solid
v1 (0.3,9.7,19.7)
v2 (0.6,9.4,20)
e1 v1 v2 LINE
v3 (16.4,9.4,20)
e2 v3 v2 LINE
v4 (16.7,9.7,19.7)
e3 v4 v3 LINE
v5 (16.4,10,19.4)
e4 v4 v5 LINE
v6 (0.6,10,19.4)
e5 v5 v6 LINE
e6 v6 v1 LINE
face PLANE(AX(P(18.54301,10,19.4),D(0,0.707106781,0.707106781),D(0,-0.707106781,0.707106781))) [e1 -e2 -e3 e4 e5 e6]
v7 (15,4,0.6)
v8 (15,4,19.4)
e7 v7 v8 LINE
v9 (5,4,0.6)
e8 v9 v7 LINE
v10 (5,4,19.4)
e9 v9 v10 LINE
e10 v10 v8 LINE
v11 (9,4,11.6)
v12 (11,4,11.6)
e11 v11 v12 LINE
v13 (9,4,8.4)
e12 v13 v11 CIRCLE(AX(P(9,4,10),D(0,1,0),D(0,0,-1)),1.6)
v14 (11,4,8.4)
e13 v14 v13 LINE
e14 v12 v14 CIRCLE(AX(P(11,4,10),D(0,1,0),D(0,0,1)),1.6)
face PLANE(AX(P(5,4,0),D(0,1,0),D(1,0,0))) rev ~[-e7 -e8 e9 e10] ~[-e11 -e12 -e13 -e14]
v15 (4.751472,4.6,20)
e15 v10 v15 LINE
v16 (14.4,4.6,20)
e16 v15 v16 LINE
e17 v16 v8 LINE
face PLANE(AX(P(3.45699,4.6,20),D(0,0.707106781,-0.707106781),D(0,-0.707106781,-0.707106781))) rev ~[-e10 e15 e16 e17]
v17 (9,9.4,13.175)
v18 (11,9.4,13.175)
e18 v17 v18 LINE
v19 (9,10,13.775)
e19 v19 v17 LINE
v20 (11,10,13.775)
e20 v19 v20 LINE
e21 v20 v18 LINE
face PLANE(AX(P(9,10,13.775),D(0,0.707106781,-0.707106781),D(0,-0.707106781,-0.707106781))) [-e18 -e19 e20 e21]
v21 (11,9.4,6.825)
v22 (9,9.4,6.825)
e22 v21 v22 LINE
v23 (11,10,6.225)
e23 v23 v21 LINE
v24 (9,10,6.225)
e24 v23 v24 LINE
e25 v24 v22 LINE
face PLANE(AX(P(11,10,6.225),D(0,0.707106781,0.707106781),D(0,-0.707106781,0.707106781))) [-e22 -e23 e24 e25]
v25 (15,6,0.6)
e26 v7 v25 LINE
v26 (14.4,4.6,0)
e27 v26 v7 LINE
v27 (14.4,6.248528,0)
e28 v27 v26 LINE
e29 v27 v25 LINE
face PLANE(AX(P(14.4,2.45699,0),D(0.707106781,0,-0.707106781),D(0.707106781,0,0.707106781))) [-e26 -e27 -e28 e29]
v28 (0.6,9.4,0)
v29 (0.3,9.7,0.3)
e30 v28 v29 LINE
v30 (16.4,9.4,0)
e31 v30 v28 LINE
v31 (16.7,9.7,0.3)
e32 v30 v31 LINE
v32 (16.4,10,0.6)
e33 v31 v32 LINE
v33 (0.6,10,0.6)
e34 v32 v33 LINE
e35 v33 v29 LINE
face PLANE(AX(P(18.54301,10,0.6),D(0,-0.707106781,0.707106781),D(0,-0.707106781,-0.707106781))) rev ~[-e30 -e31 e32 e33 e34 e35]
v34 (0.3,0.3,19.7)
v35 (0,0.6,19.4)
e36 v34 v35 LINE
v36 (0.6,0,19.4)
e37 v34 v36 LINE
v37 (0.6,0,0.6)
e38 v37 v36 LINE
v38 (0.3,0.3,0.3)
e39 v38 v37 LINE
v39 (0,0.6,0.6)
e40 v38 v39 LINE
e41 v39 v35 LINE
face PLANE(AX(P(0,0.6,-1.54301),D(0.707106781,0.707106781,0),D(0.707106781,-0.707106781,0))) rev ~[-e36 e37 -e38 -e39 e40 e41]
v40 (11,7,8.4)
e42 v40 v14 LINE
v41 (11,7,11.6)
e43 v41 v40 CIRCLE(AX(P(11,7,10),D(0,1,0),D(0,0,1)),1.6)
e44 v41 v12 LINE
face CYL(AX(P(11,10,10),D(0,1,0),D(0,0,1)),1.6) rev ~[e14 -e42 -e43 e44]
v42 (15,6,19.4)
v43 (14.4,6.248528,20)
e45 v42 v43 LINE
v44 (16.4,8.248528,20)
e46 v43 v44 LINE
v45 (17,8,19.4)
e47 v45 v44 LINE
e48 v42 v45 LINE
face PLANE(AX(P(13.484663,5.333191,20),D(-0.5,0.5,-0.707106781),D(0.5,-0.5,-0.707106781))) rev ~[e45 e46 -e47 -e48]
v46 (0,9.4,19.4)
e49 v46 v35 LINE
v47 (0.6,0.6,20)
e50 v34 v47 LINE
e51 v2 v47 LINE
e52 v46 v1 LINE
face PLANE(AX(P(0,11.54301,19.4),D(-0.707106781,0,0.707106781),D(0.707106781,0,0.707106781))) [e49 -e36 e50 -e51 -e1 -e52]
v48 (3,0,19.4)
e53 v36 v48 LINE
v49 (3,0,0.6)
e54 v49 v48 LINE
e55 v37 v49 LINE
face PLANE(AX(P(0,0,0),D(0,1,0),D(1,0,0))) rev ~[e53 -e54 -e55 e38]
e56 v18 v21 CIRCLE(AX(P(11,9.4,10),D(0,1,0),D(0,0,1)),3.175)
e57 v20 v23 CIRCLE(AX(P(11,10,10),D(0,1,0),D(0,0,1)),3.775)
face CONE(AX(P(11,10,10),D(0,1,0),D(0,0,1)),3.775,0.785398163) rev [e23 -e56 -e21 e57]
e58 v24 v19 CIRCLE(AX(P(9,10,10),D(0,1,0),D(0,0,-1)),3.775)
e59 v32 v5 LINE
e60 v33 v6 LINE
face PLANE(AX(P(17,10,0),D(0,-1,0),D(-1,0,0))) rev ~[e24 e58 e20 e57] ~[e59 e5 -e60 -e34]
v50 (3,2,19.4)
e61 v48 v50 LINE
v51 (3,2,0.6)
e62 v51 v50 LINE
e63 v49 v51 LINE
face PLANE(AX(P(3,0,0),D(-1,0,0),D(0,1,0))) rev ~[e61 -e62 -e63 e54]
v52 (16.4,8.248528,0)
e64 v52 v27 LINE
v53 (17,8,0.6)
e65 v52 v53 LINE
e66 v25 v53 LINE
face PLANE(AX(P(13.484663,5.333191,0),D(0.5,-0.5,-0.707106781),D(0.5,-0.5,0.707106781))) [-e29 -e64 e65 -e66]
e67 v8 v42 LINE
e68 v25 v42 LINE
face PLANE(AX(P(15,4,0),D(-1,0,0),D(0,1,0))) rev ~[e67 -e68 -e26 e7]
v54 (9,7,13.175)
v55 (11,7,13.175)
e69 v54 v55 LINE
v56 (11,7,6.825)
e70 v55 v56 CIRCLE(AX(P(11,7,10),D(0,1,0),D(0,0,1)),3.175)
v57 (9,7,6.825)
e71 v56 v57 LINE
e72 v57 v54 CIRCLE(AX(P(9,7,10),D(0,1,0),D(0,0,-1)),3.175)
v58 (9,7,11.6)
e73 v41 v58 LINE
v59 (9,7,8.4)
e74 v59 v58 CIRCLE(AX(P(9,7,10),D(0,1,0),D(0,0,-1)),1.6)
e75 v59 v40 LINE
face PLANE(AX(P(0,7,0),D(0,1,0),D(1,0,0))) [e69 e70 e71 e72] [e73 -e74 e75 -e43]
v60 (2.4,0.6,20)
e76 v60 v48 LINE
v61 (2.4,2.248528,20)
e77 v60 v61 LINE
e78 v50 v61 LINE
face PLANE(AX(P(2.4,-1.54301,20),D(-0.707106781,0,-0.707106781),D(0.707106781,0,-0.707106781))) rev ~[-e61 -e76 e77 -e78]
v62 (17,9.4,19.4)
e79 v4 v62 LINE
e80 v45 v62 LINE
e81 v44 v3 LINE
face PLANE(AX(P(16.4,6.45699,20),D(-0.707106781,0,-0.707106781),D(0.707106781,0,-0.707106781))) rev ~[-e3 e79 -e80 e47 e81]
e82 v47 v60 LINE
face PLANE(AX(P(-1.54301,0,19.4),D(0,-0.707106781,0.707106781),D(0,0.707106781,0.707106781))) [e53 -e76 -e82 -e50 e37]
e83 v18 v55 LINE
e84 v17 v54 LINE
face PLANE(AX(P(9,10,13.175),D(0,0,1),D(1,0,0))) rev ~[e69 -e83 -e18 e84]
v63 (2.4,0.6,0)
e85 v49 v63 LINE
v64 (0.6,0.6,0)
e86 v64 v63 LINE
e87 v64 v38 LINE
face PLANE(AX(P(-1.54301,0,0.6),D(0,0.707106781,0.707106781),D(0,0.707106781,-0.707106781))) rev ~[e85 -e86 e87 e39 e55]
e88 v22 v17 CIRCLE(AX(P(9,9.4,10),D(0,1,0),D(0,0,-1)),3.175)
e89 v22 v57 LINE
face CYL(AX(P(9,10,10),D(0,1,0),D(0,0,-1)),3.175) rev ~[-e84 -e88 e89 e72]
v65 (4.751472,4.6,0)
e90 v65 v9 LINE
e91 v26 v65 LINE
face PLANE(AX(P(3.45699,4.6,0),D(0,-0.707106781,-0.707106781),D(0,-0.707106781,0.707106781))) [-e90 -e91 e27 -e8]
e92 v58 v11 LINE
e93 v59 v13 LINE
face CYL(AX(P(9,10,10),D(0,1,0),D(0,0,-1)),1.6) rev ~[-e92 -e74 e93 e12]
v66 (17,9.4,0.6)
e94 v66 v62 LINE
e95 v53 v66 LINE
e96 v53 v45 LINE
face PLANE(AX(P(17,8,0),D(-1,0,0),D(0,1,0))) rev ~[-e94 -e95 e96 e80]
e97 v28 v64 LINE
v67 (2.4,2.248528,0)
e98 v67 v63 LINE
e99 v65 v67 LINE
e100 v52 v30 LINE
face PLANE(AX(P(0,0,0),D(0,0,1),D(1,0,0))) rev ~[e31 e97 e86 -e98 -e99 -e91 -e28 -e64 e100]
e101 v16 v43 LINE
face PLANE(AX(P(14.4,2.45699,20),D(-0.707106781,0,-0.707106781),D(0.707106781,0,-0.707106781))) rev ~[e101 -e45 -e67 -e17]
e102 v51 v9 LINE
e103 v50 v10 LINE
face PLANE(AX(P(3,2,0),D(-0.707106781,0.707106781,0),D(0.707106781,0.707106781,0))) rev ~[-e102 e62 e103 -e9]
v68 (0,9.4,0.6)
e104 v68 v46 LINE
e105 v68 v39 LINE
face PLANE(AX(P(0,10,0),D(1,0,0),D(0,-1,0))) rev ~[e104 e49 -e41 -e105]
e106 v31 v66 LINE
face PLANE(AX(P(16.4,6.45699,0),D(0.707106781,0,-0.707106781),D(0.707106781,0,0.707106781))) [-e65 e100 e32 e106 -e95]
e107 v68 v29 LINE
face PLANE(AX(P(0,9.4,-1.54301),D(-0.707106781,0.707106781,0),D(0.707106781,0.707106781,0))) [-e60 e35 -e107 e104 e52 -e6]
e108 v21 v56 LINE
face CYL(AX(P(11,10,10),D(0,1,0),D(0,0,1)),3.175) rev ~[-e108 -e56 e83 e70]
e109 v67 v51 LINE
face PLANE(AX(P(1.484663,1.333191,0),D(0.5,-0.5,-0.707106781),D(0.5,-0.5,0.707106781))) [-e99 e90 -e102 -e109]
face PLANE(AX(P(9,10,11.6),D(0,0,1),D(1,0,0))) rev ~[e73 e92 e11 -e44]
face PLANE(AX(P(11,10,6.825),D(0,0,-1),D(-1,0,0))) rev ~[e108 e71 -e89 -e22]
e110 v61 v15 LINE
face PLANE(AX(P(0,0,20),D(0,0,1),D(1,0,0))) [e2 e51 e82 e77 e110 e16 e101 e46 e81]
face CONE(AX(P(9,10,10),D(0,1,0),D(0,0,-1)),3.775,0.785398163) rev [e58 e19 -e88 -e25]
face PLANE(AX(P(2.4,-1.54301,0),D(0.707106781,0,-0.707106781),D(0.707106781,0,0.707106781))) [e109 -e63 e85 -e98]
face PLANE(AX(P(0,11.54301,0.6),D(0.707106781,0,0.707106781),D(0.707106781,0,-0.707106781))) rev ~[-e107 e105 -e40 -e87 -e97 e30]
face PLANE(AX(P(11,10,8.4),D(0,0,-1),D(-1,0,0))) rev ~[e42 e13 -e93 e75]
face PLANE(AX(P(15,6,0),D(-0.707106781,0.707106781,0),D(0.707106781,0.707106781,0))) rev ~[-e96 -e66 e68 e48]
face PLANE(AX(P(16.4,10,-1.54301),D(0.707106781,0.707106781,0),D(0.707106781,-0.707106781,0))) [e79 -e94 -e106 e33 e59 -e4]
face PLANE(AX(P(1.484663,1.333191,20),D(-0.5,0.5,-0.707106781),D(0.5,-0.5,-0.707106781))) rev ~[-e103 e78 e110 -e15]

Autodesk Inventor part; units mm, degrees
ref_plane "YZ Plane" through (0, 0, 0) normal (1, 0, 0) x (0, 1, 0)
ref_plane "XZ Plane" through (0, 0, 0) normal (0, 1, 0) x (-1, 0, 0)
ref_plane "XY Plane" through (0, 0, 0) normal (0, 0, 1) x (1, 0, 0)
sketch "Sketch1" plane through (0, 0, 0) normal (0, 0, 1) x (1, 0, 0)
  line L0 (0, 0) -> (3, 0)
  line L1 (3, 0) -> (3, 2)
  line L2 (3, 2) -> (5, 4)
  line L3 (5, 4) -> (15, 4)
  line L4 (17, 10) -> (0, 10)
  line L5 (0, 10) -> (0, 0)
  line L6 (15, 4) -> (15, 6)
  line L7 (15, 6) -> (17, 8)
  line L8 (17, 8) -> (17, 10)
  dimension "d0" = 45
  dimension "d2" = 3
  dimension "d4" = 10
  dimension "d6" = 2
  dimension "d7" = 2
  dimension "d8" = 2
  dimension "d25" = 2
extrude "Extrusion1" add sketch "Sketch1" along normal blind 20
sketch "Sketch2" plane through (0, 10, 0) normal (0, 1, 0) x (1, 0, 0)
  line L0 (7.4, -10) -> (12.6, -10) construction
  line L1 (9, -11.6) -> (11, -11.6)
  line L2 (11, -8.4) -> (9, -8.4)
  arc A0 (9, -8.4) -> (9, -11.6) centre (9, -10) ccw
  arc A1 (11, -11.6) -> (11, -8.4) centre (11, -10) ccw
  line L3 (9, -10) -> (11, -10) construction
  line L4 (9, -13.175) -> (11, -13.175)
  line L5 (11, -6.825) -> (9, -6.825)
  arc A2 (9, -6.825) -> (9, -13.175) centre (9, -10) ccw
  arc A3 (11, -13.175) -> (11, -6.825) centre (11, -10) ccw
  line L6 (5, 0) -> (15, 0) construction
  line L7 (15, 0) -> (15, -20) construction
  line L8 (5, -20) -> (15, -20) construction
  line L9 (5, 0) -> (5, -20) construction
  point P0 (10, -10)
  point P1 (7.4, -10)
  point P2 (12.6, -10)
  point P3 (5.825, -10)
  point P4 (10, -20)
  point P5 (5, -10)
  dimension "d11" = 3.2
  dimension "d16" = 6.35
  dimension "d24" = 2
extrude "Extrusion2" cut sketch "Sketch2" against normal through all contours A0 L2 A1 L1
extrude "Extrusion3" cut sketch "Sketch2" against normal blind 3 contours A0 L2 A1 L1 | A2 L5 A3 L4
chamfer "Chamfer1" distance 0.6 angle 45 25 edges at (8.5, 10, 20) (8.5, 10, 0) (0, 10, 10) (0, 5, 20) (0, 5, 0) (0, 0, 10) (1.5, 0, 20) (1.5, 0, 0) (16, 7, 20) (15, 5, 20) (10, 4, 20) (4, 3, 20) (3, 1, 20) (3, 1, 0) (4, 3, 0) (10, 4, 0) (15, 5, 0) (16, 7, 0) (14.175, 10, 10) (10, 10, 13.175) (5.825, 10, 10) (10, 10, 6.825) (17, 9, 20) (17, 9, 0) (17, 10, 10)
equation "\"d7\" = d6"
equation "\"d8\" = d7"
equation "\"d25\" = d7"
